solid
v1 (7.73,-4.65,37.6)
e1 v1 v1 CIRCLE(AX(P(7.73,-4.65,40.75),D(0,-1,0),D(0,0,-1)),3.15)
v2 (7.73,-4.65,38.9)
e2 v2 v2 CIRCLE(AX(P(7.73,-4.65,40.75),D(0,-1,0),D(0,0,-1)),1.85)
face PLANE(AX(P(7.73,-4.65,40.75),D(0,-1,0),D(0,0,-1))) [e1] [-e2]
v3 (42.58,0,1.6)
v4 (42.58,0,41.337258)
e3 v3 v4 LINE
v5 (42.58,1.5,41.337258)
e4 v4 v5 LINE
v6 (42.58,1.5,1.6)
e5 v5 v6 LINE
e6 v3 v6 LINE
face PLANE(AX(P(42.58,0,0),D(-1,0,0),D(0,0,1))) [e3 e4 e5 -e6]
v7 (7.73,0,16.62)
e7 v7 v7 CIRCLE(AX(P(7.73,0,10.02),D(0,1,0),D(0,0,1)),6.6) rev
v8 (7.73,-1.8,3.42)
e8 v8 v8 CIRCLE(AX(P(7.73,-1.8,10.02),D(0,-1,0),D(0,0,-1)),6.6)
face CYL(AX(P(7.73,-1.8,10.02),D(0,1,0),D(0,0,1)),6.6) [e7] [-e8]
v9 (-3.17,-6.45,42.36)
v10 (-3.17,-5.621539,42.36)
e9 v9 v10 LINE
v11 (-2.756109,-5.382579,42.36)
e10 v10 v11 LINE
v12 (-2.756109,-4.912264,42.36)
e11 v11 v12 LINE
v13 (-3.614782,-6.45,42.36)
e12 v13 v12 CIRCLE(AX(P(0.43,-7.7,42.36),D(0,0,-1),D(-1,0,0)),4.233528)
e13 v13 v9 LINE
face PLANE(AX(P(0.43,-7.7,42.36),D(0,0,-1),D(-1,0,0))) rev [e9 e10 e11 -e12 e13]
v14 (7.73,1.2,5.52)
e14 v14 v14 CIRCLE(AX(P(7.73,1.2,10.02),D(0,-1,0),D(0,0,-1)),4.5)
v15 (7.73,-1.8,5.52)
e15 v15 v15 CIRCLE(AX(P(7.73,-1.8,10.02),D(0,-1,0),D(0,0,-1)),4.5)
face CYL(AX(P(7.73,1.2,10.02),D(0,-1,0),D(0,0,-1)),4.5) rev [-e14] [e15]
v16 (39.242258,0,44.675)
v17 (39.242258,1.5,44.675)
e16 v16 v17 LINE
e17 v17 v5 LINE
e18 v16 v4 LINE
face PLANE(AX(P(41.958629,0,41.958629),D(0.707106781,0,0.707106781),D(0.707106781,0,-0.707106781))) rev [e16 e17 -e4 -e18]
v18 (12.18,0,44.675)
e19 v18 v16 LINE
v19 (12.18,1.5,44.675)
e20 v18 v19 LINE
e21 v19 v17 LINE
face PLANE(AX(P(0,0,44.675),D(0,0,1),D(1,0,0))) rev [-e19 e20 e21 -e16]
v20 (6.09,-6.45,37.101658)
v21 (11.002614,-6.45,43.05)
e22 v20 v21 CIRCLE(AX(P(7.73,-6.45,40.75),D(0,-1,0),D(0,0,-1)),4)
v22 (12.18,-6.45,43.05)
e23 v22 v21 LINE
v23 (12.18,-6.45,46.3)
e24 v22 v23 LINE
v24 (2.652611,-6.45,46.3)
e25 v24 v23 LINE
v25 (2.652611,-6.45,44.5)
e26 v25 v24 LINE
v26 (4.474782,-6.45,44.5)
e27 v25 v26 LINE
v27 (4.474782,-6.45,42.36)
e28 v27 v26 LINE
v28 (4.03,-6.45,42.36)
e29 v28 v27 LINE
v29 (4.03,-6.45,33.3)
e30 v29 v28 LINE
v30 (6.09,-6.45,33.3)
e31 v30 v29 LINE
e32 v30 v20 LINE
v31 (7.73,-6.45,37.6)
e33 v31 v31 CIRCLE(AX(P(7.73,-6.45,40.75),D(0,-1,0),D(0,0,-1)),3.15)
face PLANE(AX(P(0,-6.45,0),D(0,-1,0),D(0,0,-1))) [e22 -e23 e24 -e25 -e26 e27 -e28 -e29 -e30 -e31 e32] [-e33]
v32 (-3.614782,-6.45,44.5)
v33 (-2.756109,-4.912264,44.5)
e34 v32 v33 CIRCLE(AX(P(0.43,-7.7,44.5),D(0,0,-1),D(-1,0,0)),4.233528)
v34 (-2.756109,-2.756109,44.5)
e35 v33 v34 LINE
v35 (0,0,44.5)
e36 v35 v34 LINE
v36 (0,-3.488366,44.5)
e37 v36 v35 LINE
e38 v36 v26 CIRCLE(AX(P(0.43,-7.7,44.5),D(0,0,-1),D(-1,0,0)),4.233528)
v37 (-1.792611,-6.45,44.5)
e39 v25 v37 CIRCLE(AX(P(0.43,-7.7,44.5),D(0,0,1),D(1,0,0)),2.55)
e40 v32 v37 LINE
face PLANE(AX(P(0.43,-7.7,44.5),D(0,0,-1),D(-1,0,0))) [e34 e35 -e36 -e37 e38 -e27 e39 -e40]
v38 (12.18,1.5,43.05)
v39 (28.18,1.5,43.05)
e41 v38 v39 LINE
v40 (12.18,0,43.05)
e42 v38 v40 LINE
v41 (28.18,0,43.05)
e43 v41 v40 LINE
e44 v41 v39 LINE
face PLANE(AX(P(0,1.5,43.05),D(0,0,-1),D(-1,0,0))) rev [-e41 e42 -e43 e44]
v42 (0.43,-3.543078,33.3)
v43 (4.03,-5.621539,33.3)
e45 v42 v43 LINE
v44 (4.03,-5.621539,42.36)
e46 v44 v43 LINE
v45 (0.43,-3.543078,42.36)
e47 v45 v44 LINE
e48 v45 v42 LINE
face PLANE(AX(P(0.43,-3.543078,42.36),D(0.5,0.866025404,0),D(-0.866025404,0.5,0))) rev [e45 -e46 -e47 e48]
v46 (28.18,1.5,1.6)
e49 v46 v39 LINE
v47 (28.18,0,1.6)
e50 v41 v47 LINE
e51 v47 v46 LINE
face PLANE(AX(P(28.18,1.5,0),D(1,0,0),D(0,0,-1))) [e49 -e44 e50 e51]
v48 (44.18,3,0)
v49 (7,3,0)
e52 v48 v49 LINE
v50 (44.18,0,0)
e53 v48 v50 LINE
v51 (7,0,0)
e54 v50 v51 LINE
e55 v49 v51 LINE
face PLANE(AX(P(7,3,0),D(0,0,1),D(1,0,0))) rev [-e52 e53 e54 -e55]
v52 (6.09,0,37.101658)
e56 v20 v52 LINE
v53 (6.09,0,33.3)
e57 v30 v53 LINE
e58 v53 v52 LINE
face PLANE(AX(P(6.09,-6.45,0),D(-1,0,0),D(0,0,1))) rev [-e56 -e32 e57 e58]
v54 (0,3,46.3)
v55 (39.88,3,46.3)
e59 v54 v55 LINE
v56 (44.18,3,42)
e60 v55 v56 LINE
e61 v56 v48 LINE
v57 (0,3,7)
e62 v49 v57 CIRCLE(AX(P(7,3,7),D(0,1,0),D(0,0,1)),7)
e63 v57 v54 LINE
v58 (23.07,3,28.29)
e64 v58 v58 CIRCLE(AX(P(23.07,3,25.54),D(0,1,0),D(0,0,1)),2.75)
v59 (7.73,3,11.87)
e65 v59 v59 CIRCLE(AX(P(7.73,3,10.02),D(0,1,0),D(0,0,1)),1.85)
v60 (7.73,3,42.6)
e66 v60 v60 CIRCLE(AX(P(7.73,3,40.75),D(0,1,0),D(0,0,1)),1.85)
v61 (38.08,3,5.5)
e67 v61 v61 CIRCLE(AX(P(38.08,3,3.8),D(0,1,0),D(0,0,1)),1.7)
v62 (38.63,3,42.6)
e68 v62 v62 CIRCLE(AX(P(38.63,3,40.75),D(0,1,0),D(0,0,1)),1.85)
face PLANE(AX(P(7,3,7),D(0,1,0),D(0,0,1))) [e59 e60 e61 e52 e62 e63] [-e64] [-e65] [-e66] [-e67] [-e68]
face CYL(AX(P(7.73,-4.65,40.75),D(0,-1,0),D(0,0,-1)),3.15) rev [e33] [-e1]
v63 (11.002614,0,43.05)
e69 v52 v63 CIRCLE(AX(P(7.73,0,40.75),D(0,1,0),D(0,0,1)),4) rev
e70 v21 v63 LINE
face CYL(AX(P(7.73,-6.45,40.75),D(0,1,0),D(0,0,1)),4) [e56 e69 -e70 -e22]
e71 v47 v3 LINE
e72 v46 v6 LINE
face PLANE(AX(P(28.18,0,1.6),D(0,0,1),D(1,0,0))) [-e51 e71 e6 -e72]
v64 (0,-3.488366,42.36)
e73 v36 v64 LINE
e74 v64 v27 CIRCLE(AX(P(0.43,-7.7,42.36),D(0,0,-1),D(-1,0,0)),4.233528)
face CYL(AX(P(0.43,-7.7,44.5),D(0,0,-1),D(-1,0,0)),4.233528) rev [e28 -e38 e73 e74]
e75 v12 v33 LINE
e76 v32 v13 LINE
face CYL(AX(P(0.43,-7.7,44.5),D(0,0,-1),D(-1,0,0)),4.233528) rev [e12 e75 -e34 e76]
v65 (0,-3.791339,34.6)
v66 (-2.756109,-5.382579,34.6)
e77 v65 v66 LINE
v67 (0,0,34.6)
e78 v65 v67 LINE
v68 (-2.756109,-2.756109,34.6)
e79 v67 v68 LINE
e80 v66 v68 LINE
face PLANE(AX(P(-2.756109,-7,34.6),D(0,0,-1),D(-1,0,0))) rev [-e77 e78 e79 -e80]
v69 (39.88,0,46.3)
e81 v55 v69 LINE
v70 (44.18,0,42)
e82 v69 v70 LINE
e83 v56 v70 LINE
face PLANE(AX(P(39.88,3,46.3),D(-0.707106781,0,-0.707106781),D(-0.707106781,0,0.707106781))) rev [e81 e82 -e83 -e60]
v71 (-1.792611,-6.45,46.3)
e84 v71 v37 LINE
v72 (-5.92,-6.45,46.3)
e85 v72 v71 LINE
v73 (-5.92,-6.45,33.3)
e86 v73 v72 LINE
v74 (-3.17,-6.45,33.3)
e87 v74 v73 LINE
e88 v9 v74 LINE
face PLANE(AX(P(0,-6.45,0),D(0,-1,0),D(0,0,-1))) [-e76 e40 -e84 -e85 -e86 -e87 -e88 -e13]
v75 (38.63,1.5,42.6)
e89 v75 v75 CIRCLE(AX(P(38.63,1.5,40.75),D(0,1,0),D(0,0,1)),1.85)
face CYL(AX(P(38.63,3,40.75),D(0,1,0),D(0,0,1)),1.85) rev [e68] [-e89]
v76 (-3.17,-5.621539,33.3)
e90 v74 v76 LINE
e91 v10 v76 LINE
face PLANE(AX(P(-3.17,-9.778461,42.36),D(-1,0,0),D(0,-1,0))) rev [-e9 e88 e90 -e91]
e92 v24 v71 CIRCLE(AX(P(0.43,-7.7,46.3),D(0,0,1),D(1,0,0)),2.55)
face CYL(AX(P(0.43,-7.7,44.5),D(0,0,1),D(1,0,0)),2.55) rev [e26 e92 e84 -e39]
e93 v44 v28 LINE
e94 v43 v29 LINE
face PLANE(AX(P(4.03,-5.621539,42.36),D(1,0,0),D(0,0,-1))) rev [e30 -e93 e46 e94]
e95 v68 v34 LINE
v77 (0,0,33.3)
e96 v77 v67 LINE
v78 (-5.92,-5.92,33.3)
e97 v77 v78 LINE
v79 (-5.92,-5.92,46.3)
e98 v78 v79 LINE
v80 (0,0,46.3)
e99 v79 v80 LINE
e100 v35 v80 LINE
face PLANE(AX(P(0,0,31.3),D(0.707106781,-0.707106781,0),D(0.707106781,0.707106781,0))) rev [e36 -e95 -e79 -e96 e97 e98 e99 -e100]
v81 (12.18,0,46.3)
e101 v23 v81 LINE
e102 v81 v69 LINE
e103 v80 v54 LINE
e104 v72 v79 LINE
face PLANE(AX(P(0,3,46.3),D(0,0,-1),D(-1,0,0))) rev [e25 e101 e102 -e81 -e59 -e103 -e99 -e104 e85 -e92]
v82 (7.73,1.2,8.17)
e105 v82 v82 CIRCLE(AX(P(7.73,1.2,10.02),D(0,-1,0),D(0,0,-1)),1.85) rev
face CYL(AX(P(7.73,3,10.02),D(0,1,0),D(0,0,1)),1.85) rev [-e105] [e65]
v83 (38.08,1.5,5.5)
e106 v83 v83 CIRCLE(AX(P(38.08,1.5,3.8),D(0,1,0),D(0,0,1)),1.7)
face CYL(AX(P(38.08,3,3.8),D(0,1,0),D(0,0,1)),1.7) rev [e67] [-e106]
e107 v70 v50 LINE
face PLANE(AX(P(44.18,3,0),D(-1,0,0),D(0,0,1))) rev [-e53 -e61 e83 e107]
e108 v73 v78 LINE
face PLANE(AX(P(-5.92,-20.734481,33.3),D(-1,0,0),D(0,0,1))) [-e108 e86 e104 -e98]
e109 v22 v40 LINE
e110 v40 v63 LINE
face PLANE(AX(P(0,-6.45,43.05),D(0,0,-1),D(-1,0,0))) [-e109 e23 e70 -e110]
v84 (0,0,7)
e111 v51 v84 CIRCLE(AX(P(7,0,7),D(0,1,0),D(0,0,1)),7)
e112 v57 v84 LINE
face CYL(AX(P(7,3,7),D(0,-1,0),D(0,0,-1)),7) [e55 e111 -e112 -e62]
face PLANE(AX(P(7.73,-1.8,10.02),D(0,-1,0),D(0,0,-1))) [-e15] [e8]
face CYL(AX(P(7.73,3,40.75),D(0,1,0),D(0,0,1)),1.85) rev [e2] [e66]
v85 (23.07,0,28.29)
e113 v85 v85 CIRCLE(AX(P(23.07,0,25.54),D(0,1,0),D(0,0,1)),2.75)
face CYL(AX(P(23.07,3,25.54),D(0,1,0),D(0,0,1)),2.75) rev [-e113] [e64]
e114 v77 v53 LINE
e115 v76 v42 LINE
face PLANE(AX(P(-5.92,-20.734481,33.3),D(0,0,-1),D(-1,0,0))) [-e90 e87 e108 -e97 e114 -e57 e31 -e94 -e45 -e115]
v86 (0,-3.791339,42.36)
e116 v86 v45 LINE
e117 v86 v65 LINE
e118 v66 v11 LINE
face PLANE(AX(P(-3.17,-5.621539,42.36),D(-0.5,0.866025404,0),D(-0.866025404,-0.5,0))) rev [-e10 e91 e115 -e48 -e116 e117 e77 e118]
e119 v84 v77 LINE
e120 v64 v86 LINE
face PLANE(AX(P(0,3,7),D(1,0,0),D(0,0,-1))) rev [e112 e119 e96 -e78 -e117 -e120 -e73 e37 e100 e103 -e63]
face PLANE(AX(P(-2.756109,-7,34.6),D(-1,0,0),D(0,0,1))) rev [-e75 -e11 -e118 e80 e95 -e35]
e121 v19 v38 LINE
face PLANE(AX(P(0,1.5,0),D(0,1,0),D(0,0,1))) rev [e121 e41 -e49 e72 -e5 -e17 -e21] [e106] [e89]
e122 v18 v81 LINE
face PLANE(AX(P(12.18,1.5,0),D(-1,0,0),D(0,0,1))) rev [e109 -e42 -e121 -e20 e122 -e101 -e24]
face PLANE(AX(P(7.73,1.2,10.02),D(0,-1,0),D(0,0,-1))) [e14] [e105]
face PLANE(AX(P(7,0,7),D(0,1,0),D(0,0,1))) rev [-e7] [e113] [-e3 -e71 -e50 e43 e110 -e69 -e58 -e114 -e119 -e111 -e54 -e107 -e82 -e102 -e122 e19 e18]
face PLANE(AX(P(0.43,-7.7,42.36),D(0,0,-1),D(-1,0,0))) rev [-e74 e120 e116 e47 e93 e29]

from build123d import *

# Parameters (mm, degrees)
SKETCH1_R                  = 13.5
BOSS_EXTRUDE1_DEPTH        = 3
CAVITY26_OUTLINE_R         = 1.85
CAVITY26_OUTLINE_R_2       = 1.7
CAVITY26_DEPTH             = 1.5
F_24_0_24_DIAMETER_HOLE1_D = 3.7
BOSS_EXTRUDE2_START        = -3
SKETCH6_R                  = 13.5
BOSS_EXTRUDE2_DEPTH        = 3
F_24_0_24_DIAMETER_HOLE2_D = 5.5
SKETCH14_W                 = 5.92
SKETCH14_H                 = 13
BOSS_EXTRUDE6_DEPTH        = 9.45
SKETCH13_R                 = 4
BOSS_EXTRUDE7_DEPTH        = 6.45
BOSS_EXTRUDE8_DEPTH        = 6.45
F_24_0_24_DIAMETER_HOLE3_D = 3.7
CUT_EXTRUDE3_DEPTH         = 9.06
SKETCH19_R                 = 2.55
CUT_EXTRUDE4_DEPTH         = 1.8
CUT_EXTRUDE5_START         = -11.2
SKETCH23_R                 = 4.233528458
CUT_EXTRUDE5_DEPTH         = 2.14
SKETCH24_W                 = 2.756109072
SKETCH24_H                 = 9.9
CUT_EXTRUDE6_DEPTH         = 10
CAVITY27_DEPTH             = 1.5
CAVITY27_START             = -6.45
CAVITY27_2_OUTLINE_R       = 3.15
CAVITY27_2_OUTLINE_R_2     = 1.85
CAVITY27_2_DEPTH           = 1.8
BOSS_EXTRUDE9_START        = 1.8
SKETCH25_R                 = 6.6
SKETCH25_R_2               = 1.85
BOSS_EXTRUDE9_DEPTH        = 1.8
SKETCH26_R                 = 4.5
CUT_EXTRUDE7_DEPTH         = 3
SKETCH27_R                 = 1.85
BOSS_EXTRUDE10_DEPTH       = 3
CUT_EXTRUDE8_START         = -1.5
CUT_EXTRUDE8_DEPTH         = 1.5
CUT_EXTRUDE9_DEPTH         = 15
F_24_0_24_DIAMETER_HOLE4_D = 3.4


# Read off the part's stored shape, not the designer's step: Cavity26, Cavity27
with BuildPart() as part:
    # Sketch1 → Boss-Extrude1 (new body)
    with BuildSketch(Plane(origin=(0, 0, 0), x_dir=(1, 0, 0), z_dir=(0, 1, 0))):
        with BuildLine():
            Line((39.88, -46.3), (44.18, -42))
            Line((44.18, -42), (44.18, 0))
            Line((44.18, 0), (7, 0))
            ThreePointArc((7, 0), (2.050252532, -2.050252532), (0, -7))
            Line((0, -7), (0, -46.3))
            Line((0, -46.3), (39.88, -46.3))
        make_face()
        with Locations(Location((23.07, -25.54, 0), (0, 0, 270))):
            Circle(SKETCH1_R, mode=Mode.SUBTRACT)
    extrude(amount=BOSS_EXTRUDE1_DEPTH)

    # Cavity26 outline → Cavity26 (cut)
    # profile 1 of 2: a face of its own
    with BuildSketch(Plane(origin=(0, 0, 0), x_dir=(1, 0, 0), z_dir=(0, 1, 0))):
        with BuildLine():
            Line((40.98, -20.5), (35.593913126, -20.5))
            ThreePointArc((35.593913126, -20.5), (36.300391291, -22.855461624), (36.567866498, -25.3))
            Line((36.567866498, -25.3), (40.93, -25.3))
            Line((40.93, -25.3), (40.93, -37.4))
            Line((40.93, -37.4), (37.464525778, -37.4))
            ThreePointArc((37.464525778, -37.4), (35.919832787, -38.039832787), (35.28, -39.584525778))
            Line((35.28, -39.584525778), (35.28, -43.05))
            Line((35.28, -43.05), (12.18, -43.05))
            Line((12.18, -43.05), (12.18, -44.675))
            Line((12.18, -44.675), (39.2422583, -44.675))
            Line((39.2422583, -44.675), (42.58, -41.3372583))
            Line((42.58, -41.3372583), (42.58, -22.55))
            Line((42.58, -22.55), (40.98, -22.55))
            Line((40.98, -22.55), (40.98, -20.5))
        make_face()
        with Locations((38.63, -40.75)):
            Circle(CAVITY26_OUTLINE_R, mode=Mode.SUBTRACT)
    # profile 2 of 2: a face of its own
    with BuildSketch(Plane(origin=(0, 0, 0), x_dir=(1, 0, 0), z_dir=(0, 1, 0))):
        with BuildLine():
            Line((40.98, -6.35), (42.58, -6.35))
            Line((42.58, -6.35), (42.58, -1.6))
            Line((42.58, -1.6), (28.18, -1.6))
            Line((28.18, -1.6), (28.18, -10.6))
            Line((28.18, -10.6), (29.56, -10.6))
            Line((29.56, -10.6), (29.56, -8.2))
            Line((29.56, -8.2), (31.16, -8.2))
            Line((31.16, -8.2), (31.16, -6.35))
            Line((31.16, -6.35), (35.06, -6.35))
            Line((35.06, -6.35), (35.06, -8.4))
            Line((35.06, -8.4), (36.21908731, -8.4))
            ThreePointArc((36.21908731, -8.4), (38.578420387, -7.150450959), (40.98, -8.31674455))
            Line((40.98, -8.31674455), (40.98, -6.35))
        make_face()
        with Locations((38.08, -3.8)):
            Circle(CAVITY26_OUTLINE_R_2, mode=Mode.SUBTRACT)
    extrude(amount=CAVITY26_DEPTH, mode=Mode.SUBTRACT)

    # Ø24.0 (24) Diameter Hole1 (through all)
    with Locations(Plane(origin=(0, 3, 0), x_dir=(1, 0, 0), z_dir=(0, 1, 0))):
        with Locations((38.63, -10.1), (38.63, -40.75), (7.73, -40.75), (7.73, -10.02)):
            Hole(F_24_0_24_DIAMETER_HOLE1_D / 2)

    # Sketch6 → Boss-Extrude2 (add)
    with BuildSketch(Plane(origin=(0, 3, 0), x_dir=(1, 0, 0), z_dir=(0, 1, 0)).offset(BOSS_EXTRUDE2_START)):
        with Locations((23.07, -25.54)):
            Circle(SKETCH6_R)
    extrude(amount=BOSS_EXTRUDE2_DEPTH)

    # Ø24.0 (24) Diameter Hole2 (through all)
    with Locations(Plane(origin=(0, 3, 0), x_dir=(1, 0, 0), z_dir=(0, 1, 0))):
        with Locations((23.07, -25.54)):
            Hole(F_24_0_24_DIAMETER_HOLE2_D / 2)

    # Sketch14 → Boss-Extrude6 (add)
    with BuildSketch(Plane(origin=(0, 3, 0), x_dir=(1, 0, 0), z_dir=(0, 1, 0))):
        with Locations((-2.96, -39.8)):
            Rectangle(SKETCH14_W, SKETCH14_H)
    extrude(amount=-BOSS_EXTRUDE6_DEPTH)

    # Sketch13 → Boss-Extrude7 (add)
    with BuildSketch(Plane(origin=(0, 0, 0), x_dir=(-1, 0, 0), z_dir=(0, -1, 0))):
        with Locations(Location((-7.73, -40.75, 0), (0, 0, 270))):
            Circle(SKETCH13_R)
    extrude(amount=BOSS_EXTRUDE7_DEPTH)

    # Sketch15 → Boss-Extrude8 (add)
    with BuildSketch(Plane(origin=(0, 0, 0), x_dir=(-1, 0, 0), z_dir=(0, -1, 0))):
        with BuildLine():
            Line((-11.002613634, -43.05), (-12.18, -43.05))
            Line((-12.18, -43.05), (-12.18, -44.675))
            Line((-12.18, -44.675), (-12.18, -46.3))
            Line((-12.18, -46.3), (0, -46.3))
            Line((0, -46.3), (0, -33.3))
            Line((0, -33.3), (-6.09, -33.3))
            Line((-6.09, -33.3), (-6.09, -37.101657911))
            ThreePointArc((-6.09, -37.101657911), (-4.371428875, -38.577443902), (-3.73, -40.75))
            ThreePointArc((-3.73, -40.75), (-6.523860401, -44.563820561), (-11.002613634, -43.05))
        make_face()
    extrude(amount=BOSS_EXTRUDE8_DEPTH)

    # Ø24.0 (24) Diameter Hole3 (through all)
    with Locations(Plane(origin=(0, 3, 0), x_dir=(1, 0, 0), z_dir=(0, 1, 0))):
        with Locations((7.73, -40.75)):
            Hole(F_24_0_24_DIAMETER_HOLE3_D / 2)

    # Sketch18 → Cut-Extrude3 (cut)
    with BuildSketch(Plane(origin=(0, 0, 33.3), x_dir=(-1, 0, 0), z_dir=(0, 0, -1))):
        Polygon((-0.43, -11.856921938), (3.17, -9.778460969), (3.17, -5.621539031), (-0.43, -3.543078062), (-4.03, -5.621539031), (-4.03, -9.778460969), align=None)
    extrude(amount=-CUT_EXTRUDE3_DEPTH, mode=Mode.SUBTRACT)

    # Sketch19 → Cut-Extrude4 (cut)
    with BuildSketch(Plane.XY.offset(46.3)):
        with Locations((0.43, -7.7)):
            Circle(SKETCH19_R)
    extrude(amount=-CUT_EXTRUDE4_DEPTH, mode=Mode.SUBTRACT)

    # Sketch23 → Cut-Extrude5 (cut)
    with BuildSketch(Plane(origin=(0, 0, 33.3), x_dir=(-1, 0, 0), z_dir=(0, 0, -1)).offset(CUT_EXTRUDE5_START)):
        with Locations((-0.43, -7.7)):
            Circle(SKETCH23_R)
    extrude(amount=CUT_EXTRUDE5_DEPTH, mode=Mode.SUBTRACT)

    # Sketch24 → Cut-Extrude6 (cut)
    with BuildSketch(Plane(origin=(0, 3, 0), x_dir=(1, 0, 0), z_dir=(0, 1, 0))):
        with Locations((-1.378054536, -39.55)):
            Rectangle(SKETCH24_W, SKETCH24_H)
    extrude(amount=-CUT_EXTRUDE6_DEPTH, mode=Mode.SUBTRACT)

    # Cavity27 outline → Cavity27 (cut)
    with BuildSketch(Plane(origin=(0, 0, 0), x_dir=(1, 0, 0), z_dir=(0, 1, 0))):
        with BuildLine():
            ThreePointArc((28.18, -21.3), (29.351572875, -24.128427125), (32.18, -25.3))
            Line((32.18, -25.3), (36.567866498, -25.3))
            ThreePointArc((36.567866498, -25.3), (36.300391291, -22.855461624), (35.593913126, -20.5))
            Line((35.593913126, -20.5), (35.06, -20.5))
            Line((35.06, -20.5), (35.06, -22.55))
            Line((35.06, -22.55), (31.16, -22.55))
            Line((31.16, -22.55), (31.16, -20.7))
            Line((31.16, -20.7), (29.56, -20.7))
            Line((29.56, -20.7), (29.56, -18.3))
            Line((29.56, -18.3), (28.18, -18.3))
            Line((28.18, -18.3), (28.18, -21.3))
        make_face()
    extrude(amount=CAVITY27_DEPTH, mode=Mode.SUBTRACT)

    # Cavity27 2 outline → Cavity27 2 (cut)
    with BuildSketch(Plane(origin=(0, 0, 0), x_dir=(1, 0, 0), z_dir=(0, 1, 0)).offset(CAVITY27_START)):
        with Locations((7.73, -40.75)):
            Circle(CAVITY27_2_OUTLINE_R)
        with Locations((7.73, -40.75)):
            Circle(CAVITY27_2_OUTLINE_R_2, mode=Mode.SUBTRACT)
    extrude(amount=CAVITY27_2_DEPTH, mode=Mode.SUBTRACT)

    # Sketch25 → Boss-Extrude9 (add)
    with BuildSketch(Plane.XZ.offset(BOSS_EXTRUDE9_START)):
        with Locations(Location((7.73, 10.02, 0), (0, 0, 90))):
            Circle(SKETCH25_R)
        with Locations(Location((7.73, 10.02, 0), (0, 0, 90))):
            Circle(SKETCH25_R_2, mode=Mode.SUBTRACT)
    extrude(amount=-BOSS_EXTRUDE9_DEPTH)

    # Sketch26 → Cut-Extrude7 (cut)
    with BuildSketch(Plane(origin=(0, -1.8, 0), x_dir=(-1, 0, 0), z_dir=(0, -1, 0))):
        with Locations(Location((-7.73, -10.02, 0), (0, 0, 90))):
            Circle(SKETCH26_R)
    extrude(amount=-CUT_EXTRUDE7_DEPTH, mode=Mode.SUBTRACT)

    # Sketch27 → Boss-Extrude10 (add)
    with BuildSketch(Plane(origin=(0, 0, 0), x_dir=(-1, 0, 0), z_dir=(0, -1, 0))):
        with Locations((-38.63, -10.1)):
            Circle(SKETCH27_R)
    extrude(amount=-BOSS_EXTRUDE10_DEPTH)

    # Sketch28 → Cut-Extrude8 (cut)
    with BuildSketch(Plane(origin=(0, 0, 0), x_dir=(-1, 0, 0), z_dir=(0, -1, 0)).offset(CUT_EXTRUDE8_START)):
        Polygon((-42.58, -22.55), (-42.58, -1.6), (-28.18, -1.6), (-28.18, -18.3), (-28.18, -43.05), (-35.28, -43.05), (-40.91112915, -43.00612915), (-42.217305027, -41.699953273), align=None)
    extrude(amount=CUT_EXTRUDE8_DEPTH, mode=Mode.SUBTRACT)

    # Sketch29 → Cut-Extrude9 (cut)
    with BuildSketch(Plane.XY.offset(46.3)):
        Polygon((0, 0), (-5.92, -5.92), (-5.92, 3), (0, 3), align=None)
    extrude(amount=-CUT_EXTRUDE9_DEPTH, mode=Mode.SUBTRACT)

    # Ø24.0 (24) Diameter Hole4 (through all)
    with Locations(Plane(origin=(0, 3, 0), x_dir=(1, 0, 0), z_dir=(0, 1, 0))):
        with Locations((38.08, -3.8)):
            Hole(F_24_0_24_DIAMETER_HOLE4_D / 2)


solid = part.part
